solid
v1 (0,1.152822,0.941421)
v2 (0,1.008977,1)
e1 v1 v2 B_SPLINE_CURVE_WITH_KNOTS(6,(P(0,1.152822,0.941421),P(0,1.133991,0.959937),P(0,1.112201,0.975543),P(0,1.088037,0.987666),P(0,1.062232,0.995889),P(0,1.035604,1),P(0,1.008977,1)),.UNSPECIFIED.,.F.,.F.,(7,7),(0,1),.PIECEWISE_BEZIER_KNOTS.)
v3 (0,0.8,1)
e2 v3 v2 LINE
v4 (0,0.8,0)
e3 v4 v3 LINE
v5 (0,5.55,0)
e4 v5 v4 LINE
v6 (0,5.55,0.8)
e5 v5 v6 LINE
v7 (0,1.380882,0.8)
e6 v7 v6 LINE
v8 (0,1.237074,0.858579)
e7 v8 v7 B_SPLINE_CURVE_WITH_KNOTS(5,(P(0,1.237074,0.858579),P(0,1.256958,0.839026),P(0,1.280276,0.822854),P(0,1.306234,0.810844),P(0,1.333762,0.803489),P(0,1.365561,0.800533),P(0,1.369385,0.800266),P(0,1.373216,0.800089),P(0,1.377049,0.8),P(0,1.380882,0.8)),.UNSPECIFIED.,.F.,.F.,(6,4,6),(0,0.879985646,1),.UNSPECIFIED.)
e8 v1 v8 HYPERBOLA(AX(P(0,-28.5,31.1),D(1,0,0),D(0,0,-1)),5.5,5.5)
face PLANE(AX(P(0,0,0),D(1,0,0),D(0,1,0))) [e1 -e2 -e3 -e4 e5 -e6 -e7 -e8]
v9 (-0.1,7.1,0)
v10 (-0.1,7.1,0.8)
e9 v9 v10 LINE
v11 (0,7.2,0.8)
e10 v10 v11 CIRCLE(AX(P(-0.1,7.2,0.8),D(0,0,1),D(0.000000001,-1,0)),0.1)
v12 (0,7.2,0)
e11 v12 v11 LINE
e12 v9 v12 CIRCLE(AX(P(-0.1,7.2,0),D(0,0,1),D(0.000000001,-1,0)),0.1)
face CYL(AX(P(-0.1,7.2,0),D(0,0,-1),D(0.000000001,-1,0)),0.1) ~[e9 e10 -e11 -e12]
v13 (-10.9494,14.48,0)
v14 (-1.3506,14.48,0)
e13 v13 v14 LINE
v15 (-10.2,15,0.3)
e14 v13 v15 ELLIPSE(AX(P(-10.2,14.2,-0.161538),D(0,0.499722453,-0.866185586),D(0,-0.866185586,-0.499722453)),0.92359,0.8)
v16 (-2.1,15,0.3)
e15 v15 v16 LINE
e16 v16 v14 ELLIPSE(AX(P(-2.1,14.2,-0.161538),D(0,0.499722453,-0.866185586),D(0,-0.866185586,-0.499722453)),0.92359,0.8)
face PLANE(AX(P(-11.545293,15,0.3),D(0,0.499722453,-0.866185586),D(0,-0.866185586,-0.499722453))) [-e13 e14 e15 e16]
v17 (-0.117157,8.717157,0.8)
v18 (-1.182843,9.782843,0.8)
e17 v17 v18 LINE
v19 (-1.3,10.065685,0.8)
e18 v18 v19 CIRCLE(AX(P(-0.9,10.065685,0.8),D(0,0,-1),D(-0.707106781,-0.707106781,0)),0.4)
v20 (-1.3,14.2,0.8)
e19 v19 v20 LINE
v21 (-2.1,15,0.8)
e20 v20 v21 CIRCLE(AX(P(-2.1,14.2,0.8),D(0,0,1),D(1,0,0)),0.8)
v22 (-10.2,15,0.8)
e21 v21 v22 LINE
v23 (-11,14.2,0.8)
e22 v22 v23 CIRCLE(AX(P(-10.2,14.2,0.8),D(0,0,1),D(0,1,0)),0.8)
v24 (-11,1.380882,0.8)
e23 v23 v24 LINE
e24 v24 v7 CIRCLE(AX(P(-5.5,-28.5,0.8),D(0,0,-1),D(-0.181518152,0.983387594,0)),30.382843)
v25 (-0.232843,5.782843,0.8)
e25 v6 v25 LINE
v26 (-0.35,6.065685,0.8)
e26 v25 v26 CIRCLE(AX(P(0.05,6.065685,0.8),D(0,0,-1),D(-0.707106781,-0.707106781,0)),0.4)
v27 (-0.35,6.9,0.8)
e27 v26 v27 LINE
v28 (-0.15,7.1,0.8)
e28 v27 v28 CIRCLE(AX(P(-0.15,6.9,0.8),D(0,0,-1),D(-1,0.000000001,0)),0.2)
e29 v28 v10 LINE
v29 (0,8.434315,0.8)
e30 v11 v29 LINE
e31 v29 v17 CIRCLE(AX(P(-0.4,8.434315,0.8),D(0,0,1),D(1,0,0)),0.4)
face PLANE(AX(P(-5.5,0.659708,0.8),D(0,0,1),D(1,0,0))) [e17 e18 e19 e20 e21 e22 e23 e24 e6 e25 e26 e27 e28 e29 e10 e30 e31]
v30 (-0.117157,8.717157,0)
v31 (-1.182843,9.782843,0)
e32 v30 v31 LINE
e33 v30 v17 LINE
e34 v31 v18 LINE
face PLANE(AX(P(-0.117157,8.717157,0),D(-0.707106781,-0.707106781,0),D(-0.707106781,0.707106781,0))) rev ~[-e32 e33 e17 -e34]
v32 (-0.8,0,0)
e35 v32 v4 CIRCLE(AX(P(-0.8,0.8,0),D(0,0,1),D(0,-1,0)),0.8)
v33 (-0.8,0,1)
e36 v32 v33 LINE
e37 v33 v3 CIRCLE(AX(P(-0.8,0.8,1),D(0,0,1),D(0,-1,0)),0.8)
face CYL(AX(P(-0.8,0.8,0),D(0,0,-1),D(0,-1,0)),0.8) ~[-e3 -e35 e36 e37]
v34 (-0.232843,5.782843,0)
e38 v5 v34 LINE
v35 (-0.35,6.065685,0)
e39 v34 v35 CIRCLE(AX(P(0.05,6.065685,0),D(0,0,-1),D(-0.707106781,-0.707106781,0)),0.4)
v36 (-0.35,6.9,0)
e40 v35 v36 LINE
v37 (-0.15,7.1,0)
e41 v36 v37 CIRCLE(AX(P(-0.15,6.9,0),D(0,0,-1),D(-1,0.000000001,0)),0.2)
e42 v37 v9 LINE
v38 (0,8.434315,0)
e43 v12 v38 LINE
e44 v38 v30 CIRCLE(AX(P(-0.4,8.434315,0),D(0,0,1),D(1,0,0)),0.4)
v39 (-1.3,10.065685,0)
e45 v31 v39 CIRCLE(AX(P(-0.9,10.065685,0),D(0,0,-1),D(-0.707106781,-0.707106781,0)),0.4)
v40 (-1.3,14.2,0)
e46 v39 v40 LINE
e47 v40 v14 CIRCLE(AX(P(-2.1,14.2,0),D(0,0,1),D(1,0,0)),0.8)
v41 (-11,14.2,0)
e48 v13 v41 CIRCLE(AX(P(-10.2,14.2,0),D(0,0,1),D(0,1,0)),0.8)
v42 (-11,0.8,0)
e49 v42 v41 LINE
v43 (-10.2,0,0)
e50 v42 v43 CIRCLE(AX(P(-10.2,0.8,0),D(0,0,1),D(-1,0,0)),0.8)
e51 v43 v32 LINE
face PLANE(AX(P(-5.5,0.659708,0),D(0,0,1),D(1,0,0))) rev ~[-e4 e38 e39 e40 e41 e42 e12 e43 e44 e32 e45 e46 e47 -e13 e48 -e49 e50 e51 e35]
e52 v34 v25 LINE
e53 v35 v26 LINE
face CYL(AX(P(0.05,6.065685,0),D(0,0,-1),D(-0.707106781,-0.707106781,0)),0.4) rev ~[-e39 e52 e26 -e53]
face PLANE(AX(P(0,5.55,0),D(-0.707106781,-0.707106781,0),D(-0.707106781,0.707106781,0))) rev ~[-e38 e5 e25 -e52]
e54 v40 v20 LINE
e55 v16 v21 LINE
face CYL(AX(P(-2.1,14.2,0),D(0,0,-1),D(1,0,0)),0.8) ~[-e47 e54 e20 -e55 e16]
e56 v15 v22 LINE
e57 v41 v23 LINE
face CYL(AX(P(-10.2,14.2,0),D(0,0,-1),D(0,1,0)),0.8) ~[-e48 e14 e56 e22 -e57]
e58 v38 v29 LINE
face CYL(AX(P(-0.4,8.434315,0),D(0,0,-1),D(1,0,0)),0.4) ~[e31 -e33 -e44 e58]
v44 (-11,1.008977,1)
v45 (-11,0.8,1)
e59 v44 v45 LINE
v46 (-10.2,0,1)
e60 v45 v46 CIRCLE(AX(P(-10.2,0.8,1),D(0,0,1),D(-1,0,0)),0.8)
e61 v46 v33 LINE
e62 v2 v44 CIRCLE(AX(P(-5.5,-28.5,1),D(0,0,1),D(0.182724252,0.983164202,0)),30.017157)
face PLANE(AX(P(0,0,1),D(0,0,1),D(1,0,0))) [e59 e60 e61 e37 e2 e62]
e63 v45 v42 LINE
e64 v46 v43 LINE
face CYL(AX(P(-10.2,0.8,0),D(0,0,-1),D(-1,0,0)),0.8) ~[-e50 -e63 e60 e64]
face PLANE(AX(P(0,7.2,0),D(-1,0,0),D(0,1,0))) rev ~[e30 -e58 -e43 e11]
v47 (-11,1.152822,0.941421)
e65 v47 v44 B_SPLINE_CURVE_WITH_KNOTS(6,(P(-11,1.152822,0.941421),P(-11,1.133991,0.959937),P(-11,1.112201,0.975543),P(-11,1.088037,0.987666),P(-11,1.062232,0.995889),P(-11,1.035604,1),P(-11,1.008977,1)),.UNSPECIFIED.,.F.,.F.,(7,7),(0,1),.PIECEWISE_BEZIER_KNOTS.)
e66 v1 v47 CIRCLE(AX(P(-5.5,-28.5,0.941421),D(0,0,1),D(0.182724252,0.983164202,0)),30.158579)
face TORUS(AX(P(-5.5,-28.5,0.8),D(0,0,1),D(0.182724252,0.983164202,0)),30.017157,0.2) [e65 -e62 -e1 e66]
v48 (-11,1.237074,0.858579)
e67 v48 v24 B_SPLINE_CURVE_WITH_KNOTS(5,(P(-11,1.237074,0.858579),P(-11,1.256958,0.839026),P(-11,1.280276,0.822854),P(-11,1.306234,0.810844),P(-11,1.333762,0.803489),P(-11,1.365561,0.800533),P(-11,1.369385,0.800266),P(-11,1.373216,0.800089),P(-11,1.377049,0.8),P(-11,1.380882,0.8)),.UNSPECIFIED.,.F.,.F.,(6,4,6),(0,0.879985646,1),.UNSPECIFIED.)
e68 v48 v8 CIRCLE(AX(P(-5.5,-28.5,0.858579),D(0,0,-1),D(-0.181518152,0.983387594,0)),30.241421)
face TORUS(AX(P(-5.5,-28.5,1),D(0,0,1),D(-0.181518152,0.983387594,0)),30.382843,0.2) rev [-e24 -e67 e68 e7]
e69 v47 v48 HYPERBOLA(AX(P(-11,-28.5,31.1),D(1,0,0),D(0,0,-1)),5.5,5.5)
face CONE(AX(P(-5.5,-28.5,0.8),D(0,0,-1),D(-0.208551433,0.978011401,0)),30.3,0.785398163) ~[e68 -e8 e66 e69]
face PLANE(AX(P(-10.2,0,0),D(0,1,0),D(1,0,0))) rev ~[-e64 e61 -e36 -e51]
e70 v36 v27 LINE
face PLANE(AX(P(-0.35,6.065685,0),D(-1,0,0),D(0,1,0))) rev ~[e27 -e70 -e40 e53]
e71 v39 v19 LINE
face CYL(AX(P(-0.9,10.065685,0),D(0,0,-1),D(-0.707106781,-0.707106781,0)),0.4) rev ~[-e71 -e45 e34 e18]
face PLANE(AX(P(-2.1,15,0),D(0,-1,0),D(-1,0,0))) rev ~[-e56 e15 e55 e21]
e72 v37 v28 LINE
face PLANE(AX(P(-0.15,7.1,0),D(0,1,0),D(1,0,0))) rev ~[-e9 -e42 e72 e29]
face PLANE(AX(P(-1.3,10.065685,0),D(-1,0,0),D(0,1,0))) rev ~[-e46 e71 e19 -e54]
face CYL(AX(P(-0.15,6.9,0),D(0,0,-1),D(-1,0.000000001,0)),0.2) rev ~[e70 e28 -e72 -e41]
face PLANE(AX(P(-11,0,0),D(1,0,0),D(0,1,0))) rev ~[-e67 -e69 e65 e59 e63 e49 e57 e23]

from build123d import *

# Parameters (mm, degrees)
F1_DEPTH    = 0.8
F2_DEPTH    = 1
F3_T4_ANGLE = 24.0749520294
F4_R        = 0.2
F5_T1_DEPTH = 10.790585283


# Not quite as in the source:
# - a fillet or chamfer that OpenCascade refuses, or shapes differently, is made with other operations: its cross-section is extruded or revolved along the edge and cut away or added


with BuildPart() as f1:
    # F0 (on Top) → F1 (new body)
    with BuildSketch(Plane.XY):
        with BuildLine():
            Line((-10.2, 0), (-0.8, 0))
            ThreePointArc((-0.8, 0), (-0.2343145751, 0.2343145751), (0, 0.8))
            Line((0, 0.8), (0, 0.9915242061))
            ThreePointArc((0, 0.9915242061), (-5.5, 1.5), (-11, 0.9915242061))
            Line((-11, 0.9915242061), (-11, 0.8))
            ThreePointArc((-11, 0.8), (-10.7656854249, 0.2343145751), (-10.2, 0))
        make_face()
        with BuildLine():
            ThreePointArc((-11, 0.9915242061), (-5.5, 1.5), (0, 0.9915242061))
            Line((0, 0.9915242061), (0, 1.3315242061))
            ThreePointArc((0, 1.3315242061), (-5.5, 1.84), (-11, 1.3315242061))
            Line((-11, 1.3315242061), (-11, 0.9915242061))
        make_face()
        with BuildLine():
            ThreePointArc((-11, 1.3315242061), (-5.5, 1.84), (0, 1.3315242061))
            Line((0, 1.3315242061), (0, 5.55))
            Line((0, 5.55), (-0.2328427125, 5.7828427125))
            ThreePointArc((-0.2328427125, 5.7828427125), (-0.319551813, 5.912612052), (-0.35, 6.0656854249))
            Line((-0.35, 6.0656854249), (-0.35, 6.9))
            ThreePointArc((-0.35, 6.9), (-0.2914213562, 7.0414213562), (-0.15, 7.1))
            Line((-0.15, 7.1), (-0.1, 7.1))
            ThreePointArc((-0.1, 7.1), (-0.0292893219, 7.1292893219), (0, 7.2))
            Line((0, 7.2), (0, 8.4343145751))
            ThreePointArc((0, 8.4343145751), (-0.030448187, 8.587387948), (-0.1171572875, 8.7171572875))
            Line((-0.1171572875, 8.7171572875), (-1.1828427125, 9.7828427125))
            ThreePointArc((-1.1828427125, 9.7828427125), (-1.269551813, 9.912612052), (-1.3, 10.0656854249))
            Line((-1.3, 10.0656854249), (-1.3, 14.2))
            ThreePointArc((-1.3, 14.2), (-1.5343145751, 14.7656854249), (-2.1, 15))
            Line((-2.1, 15), (-10.2, 15))
            ThreePointArc((-10.2, 15), (-10.7656854249, 14.7656854249), (-11, 14.2))
            Line((-11, 14.2), (-11, 1.3315242061))
        make_face()
    extrude(amount=F1_DEPTH)

    # F0 (on Top) → F2 (join)
    with BuildSketch(Plane.XY):
        with BuildLine():
            Line((-10.2, 0), (-0.8, 0))
            ThreePointArc((-0.8, 0), (-0.2343145751, 0.2343145751), (0, 0.8))
            Line((0, 0.8), (0, 0.9915242061))
            ThreePointArc((0, 0.9915242061), (-5.5, 1.5), (-11, 0.9915242061))
            Line((-11, 0.9915242061), (-11, 0.8))
            ThreePointArc((-11, 0.8), (-10.7656854249, 0.2343145751), (-10.2, 0))
        make_face()
    extrude(amount=F2_DEPTH)

    # F3: chamfer of 0.3 on 1 edges, made by hand


with BuildPart() as f3_tool2:
    # F3_s3 → F3_t4 (revolve)
    with BuildSketch(Plane(origin=(-11.0738065014, -2.3613816897, 0), x_dir=(0, 0, 1), z_dir=(-0.9780114007, -0.2085514329, 0))):
        Polygon((0.8, 3.5737079623), (1.1, 3.2737079623), (0.8, 3.2737079623), align=None)
    revolve(axis=Axis((-5.5, -28.5, 0.8), (0, 0, -1)), revolution_arc=F3_T4_ANGLE)

    split(bisect_by=Plane.YZ.offset(-11), keep=Keep.TOP)

    split(bisect_by=Plane.YZ, keep=Keep.BOTTOM)

    split(bisect_by=Plane.XY.offset(1), keep=Keep.BOTTOM)


with BuildPart() as f1_1:
    add(f1.part)

    # F3_t1: union F3_tool2
    add(f3_tool2.part)

    # F4
    f4_edges = [f1_1.edges().sort_by_distance(p)[0] for p in [
        (-5.5, 1.8, 0.8),
        (-5.5, 1.6, 1),
    ]]
    fillet(f4_edges, radius=F4_R)

    # F5: chamfer of 0.52 x 0.3 on 1 edges, made by hand

    # F5_s2 → F5_t1 (cut)
    with BuildSketch(Plane.YZ.offset(-11.5452926415)):
        Polygon((15, 0.3), (14.48, 0), (15, 0), align=None)
    extrude(amount=F5_T1_DEPTH, mode=Mode.SUBTRACT)


solid = f1_1.part
